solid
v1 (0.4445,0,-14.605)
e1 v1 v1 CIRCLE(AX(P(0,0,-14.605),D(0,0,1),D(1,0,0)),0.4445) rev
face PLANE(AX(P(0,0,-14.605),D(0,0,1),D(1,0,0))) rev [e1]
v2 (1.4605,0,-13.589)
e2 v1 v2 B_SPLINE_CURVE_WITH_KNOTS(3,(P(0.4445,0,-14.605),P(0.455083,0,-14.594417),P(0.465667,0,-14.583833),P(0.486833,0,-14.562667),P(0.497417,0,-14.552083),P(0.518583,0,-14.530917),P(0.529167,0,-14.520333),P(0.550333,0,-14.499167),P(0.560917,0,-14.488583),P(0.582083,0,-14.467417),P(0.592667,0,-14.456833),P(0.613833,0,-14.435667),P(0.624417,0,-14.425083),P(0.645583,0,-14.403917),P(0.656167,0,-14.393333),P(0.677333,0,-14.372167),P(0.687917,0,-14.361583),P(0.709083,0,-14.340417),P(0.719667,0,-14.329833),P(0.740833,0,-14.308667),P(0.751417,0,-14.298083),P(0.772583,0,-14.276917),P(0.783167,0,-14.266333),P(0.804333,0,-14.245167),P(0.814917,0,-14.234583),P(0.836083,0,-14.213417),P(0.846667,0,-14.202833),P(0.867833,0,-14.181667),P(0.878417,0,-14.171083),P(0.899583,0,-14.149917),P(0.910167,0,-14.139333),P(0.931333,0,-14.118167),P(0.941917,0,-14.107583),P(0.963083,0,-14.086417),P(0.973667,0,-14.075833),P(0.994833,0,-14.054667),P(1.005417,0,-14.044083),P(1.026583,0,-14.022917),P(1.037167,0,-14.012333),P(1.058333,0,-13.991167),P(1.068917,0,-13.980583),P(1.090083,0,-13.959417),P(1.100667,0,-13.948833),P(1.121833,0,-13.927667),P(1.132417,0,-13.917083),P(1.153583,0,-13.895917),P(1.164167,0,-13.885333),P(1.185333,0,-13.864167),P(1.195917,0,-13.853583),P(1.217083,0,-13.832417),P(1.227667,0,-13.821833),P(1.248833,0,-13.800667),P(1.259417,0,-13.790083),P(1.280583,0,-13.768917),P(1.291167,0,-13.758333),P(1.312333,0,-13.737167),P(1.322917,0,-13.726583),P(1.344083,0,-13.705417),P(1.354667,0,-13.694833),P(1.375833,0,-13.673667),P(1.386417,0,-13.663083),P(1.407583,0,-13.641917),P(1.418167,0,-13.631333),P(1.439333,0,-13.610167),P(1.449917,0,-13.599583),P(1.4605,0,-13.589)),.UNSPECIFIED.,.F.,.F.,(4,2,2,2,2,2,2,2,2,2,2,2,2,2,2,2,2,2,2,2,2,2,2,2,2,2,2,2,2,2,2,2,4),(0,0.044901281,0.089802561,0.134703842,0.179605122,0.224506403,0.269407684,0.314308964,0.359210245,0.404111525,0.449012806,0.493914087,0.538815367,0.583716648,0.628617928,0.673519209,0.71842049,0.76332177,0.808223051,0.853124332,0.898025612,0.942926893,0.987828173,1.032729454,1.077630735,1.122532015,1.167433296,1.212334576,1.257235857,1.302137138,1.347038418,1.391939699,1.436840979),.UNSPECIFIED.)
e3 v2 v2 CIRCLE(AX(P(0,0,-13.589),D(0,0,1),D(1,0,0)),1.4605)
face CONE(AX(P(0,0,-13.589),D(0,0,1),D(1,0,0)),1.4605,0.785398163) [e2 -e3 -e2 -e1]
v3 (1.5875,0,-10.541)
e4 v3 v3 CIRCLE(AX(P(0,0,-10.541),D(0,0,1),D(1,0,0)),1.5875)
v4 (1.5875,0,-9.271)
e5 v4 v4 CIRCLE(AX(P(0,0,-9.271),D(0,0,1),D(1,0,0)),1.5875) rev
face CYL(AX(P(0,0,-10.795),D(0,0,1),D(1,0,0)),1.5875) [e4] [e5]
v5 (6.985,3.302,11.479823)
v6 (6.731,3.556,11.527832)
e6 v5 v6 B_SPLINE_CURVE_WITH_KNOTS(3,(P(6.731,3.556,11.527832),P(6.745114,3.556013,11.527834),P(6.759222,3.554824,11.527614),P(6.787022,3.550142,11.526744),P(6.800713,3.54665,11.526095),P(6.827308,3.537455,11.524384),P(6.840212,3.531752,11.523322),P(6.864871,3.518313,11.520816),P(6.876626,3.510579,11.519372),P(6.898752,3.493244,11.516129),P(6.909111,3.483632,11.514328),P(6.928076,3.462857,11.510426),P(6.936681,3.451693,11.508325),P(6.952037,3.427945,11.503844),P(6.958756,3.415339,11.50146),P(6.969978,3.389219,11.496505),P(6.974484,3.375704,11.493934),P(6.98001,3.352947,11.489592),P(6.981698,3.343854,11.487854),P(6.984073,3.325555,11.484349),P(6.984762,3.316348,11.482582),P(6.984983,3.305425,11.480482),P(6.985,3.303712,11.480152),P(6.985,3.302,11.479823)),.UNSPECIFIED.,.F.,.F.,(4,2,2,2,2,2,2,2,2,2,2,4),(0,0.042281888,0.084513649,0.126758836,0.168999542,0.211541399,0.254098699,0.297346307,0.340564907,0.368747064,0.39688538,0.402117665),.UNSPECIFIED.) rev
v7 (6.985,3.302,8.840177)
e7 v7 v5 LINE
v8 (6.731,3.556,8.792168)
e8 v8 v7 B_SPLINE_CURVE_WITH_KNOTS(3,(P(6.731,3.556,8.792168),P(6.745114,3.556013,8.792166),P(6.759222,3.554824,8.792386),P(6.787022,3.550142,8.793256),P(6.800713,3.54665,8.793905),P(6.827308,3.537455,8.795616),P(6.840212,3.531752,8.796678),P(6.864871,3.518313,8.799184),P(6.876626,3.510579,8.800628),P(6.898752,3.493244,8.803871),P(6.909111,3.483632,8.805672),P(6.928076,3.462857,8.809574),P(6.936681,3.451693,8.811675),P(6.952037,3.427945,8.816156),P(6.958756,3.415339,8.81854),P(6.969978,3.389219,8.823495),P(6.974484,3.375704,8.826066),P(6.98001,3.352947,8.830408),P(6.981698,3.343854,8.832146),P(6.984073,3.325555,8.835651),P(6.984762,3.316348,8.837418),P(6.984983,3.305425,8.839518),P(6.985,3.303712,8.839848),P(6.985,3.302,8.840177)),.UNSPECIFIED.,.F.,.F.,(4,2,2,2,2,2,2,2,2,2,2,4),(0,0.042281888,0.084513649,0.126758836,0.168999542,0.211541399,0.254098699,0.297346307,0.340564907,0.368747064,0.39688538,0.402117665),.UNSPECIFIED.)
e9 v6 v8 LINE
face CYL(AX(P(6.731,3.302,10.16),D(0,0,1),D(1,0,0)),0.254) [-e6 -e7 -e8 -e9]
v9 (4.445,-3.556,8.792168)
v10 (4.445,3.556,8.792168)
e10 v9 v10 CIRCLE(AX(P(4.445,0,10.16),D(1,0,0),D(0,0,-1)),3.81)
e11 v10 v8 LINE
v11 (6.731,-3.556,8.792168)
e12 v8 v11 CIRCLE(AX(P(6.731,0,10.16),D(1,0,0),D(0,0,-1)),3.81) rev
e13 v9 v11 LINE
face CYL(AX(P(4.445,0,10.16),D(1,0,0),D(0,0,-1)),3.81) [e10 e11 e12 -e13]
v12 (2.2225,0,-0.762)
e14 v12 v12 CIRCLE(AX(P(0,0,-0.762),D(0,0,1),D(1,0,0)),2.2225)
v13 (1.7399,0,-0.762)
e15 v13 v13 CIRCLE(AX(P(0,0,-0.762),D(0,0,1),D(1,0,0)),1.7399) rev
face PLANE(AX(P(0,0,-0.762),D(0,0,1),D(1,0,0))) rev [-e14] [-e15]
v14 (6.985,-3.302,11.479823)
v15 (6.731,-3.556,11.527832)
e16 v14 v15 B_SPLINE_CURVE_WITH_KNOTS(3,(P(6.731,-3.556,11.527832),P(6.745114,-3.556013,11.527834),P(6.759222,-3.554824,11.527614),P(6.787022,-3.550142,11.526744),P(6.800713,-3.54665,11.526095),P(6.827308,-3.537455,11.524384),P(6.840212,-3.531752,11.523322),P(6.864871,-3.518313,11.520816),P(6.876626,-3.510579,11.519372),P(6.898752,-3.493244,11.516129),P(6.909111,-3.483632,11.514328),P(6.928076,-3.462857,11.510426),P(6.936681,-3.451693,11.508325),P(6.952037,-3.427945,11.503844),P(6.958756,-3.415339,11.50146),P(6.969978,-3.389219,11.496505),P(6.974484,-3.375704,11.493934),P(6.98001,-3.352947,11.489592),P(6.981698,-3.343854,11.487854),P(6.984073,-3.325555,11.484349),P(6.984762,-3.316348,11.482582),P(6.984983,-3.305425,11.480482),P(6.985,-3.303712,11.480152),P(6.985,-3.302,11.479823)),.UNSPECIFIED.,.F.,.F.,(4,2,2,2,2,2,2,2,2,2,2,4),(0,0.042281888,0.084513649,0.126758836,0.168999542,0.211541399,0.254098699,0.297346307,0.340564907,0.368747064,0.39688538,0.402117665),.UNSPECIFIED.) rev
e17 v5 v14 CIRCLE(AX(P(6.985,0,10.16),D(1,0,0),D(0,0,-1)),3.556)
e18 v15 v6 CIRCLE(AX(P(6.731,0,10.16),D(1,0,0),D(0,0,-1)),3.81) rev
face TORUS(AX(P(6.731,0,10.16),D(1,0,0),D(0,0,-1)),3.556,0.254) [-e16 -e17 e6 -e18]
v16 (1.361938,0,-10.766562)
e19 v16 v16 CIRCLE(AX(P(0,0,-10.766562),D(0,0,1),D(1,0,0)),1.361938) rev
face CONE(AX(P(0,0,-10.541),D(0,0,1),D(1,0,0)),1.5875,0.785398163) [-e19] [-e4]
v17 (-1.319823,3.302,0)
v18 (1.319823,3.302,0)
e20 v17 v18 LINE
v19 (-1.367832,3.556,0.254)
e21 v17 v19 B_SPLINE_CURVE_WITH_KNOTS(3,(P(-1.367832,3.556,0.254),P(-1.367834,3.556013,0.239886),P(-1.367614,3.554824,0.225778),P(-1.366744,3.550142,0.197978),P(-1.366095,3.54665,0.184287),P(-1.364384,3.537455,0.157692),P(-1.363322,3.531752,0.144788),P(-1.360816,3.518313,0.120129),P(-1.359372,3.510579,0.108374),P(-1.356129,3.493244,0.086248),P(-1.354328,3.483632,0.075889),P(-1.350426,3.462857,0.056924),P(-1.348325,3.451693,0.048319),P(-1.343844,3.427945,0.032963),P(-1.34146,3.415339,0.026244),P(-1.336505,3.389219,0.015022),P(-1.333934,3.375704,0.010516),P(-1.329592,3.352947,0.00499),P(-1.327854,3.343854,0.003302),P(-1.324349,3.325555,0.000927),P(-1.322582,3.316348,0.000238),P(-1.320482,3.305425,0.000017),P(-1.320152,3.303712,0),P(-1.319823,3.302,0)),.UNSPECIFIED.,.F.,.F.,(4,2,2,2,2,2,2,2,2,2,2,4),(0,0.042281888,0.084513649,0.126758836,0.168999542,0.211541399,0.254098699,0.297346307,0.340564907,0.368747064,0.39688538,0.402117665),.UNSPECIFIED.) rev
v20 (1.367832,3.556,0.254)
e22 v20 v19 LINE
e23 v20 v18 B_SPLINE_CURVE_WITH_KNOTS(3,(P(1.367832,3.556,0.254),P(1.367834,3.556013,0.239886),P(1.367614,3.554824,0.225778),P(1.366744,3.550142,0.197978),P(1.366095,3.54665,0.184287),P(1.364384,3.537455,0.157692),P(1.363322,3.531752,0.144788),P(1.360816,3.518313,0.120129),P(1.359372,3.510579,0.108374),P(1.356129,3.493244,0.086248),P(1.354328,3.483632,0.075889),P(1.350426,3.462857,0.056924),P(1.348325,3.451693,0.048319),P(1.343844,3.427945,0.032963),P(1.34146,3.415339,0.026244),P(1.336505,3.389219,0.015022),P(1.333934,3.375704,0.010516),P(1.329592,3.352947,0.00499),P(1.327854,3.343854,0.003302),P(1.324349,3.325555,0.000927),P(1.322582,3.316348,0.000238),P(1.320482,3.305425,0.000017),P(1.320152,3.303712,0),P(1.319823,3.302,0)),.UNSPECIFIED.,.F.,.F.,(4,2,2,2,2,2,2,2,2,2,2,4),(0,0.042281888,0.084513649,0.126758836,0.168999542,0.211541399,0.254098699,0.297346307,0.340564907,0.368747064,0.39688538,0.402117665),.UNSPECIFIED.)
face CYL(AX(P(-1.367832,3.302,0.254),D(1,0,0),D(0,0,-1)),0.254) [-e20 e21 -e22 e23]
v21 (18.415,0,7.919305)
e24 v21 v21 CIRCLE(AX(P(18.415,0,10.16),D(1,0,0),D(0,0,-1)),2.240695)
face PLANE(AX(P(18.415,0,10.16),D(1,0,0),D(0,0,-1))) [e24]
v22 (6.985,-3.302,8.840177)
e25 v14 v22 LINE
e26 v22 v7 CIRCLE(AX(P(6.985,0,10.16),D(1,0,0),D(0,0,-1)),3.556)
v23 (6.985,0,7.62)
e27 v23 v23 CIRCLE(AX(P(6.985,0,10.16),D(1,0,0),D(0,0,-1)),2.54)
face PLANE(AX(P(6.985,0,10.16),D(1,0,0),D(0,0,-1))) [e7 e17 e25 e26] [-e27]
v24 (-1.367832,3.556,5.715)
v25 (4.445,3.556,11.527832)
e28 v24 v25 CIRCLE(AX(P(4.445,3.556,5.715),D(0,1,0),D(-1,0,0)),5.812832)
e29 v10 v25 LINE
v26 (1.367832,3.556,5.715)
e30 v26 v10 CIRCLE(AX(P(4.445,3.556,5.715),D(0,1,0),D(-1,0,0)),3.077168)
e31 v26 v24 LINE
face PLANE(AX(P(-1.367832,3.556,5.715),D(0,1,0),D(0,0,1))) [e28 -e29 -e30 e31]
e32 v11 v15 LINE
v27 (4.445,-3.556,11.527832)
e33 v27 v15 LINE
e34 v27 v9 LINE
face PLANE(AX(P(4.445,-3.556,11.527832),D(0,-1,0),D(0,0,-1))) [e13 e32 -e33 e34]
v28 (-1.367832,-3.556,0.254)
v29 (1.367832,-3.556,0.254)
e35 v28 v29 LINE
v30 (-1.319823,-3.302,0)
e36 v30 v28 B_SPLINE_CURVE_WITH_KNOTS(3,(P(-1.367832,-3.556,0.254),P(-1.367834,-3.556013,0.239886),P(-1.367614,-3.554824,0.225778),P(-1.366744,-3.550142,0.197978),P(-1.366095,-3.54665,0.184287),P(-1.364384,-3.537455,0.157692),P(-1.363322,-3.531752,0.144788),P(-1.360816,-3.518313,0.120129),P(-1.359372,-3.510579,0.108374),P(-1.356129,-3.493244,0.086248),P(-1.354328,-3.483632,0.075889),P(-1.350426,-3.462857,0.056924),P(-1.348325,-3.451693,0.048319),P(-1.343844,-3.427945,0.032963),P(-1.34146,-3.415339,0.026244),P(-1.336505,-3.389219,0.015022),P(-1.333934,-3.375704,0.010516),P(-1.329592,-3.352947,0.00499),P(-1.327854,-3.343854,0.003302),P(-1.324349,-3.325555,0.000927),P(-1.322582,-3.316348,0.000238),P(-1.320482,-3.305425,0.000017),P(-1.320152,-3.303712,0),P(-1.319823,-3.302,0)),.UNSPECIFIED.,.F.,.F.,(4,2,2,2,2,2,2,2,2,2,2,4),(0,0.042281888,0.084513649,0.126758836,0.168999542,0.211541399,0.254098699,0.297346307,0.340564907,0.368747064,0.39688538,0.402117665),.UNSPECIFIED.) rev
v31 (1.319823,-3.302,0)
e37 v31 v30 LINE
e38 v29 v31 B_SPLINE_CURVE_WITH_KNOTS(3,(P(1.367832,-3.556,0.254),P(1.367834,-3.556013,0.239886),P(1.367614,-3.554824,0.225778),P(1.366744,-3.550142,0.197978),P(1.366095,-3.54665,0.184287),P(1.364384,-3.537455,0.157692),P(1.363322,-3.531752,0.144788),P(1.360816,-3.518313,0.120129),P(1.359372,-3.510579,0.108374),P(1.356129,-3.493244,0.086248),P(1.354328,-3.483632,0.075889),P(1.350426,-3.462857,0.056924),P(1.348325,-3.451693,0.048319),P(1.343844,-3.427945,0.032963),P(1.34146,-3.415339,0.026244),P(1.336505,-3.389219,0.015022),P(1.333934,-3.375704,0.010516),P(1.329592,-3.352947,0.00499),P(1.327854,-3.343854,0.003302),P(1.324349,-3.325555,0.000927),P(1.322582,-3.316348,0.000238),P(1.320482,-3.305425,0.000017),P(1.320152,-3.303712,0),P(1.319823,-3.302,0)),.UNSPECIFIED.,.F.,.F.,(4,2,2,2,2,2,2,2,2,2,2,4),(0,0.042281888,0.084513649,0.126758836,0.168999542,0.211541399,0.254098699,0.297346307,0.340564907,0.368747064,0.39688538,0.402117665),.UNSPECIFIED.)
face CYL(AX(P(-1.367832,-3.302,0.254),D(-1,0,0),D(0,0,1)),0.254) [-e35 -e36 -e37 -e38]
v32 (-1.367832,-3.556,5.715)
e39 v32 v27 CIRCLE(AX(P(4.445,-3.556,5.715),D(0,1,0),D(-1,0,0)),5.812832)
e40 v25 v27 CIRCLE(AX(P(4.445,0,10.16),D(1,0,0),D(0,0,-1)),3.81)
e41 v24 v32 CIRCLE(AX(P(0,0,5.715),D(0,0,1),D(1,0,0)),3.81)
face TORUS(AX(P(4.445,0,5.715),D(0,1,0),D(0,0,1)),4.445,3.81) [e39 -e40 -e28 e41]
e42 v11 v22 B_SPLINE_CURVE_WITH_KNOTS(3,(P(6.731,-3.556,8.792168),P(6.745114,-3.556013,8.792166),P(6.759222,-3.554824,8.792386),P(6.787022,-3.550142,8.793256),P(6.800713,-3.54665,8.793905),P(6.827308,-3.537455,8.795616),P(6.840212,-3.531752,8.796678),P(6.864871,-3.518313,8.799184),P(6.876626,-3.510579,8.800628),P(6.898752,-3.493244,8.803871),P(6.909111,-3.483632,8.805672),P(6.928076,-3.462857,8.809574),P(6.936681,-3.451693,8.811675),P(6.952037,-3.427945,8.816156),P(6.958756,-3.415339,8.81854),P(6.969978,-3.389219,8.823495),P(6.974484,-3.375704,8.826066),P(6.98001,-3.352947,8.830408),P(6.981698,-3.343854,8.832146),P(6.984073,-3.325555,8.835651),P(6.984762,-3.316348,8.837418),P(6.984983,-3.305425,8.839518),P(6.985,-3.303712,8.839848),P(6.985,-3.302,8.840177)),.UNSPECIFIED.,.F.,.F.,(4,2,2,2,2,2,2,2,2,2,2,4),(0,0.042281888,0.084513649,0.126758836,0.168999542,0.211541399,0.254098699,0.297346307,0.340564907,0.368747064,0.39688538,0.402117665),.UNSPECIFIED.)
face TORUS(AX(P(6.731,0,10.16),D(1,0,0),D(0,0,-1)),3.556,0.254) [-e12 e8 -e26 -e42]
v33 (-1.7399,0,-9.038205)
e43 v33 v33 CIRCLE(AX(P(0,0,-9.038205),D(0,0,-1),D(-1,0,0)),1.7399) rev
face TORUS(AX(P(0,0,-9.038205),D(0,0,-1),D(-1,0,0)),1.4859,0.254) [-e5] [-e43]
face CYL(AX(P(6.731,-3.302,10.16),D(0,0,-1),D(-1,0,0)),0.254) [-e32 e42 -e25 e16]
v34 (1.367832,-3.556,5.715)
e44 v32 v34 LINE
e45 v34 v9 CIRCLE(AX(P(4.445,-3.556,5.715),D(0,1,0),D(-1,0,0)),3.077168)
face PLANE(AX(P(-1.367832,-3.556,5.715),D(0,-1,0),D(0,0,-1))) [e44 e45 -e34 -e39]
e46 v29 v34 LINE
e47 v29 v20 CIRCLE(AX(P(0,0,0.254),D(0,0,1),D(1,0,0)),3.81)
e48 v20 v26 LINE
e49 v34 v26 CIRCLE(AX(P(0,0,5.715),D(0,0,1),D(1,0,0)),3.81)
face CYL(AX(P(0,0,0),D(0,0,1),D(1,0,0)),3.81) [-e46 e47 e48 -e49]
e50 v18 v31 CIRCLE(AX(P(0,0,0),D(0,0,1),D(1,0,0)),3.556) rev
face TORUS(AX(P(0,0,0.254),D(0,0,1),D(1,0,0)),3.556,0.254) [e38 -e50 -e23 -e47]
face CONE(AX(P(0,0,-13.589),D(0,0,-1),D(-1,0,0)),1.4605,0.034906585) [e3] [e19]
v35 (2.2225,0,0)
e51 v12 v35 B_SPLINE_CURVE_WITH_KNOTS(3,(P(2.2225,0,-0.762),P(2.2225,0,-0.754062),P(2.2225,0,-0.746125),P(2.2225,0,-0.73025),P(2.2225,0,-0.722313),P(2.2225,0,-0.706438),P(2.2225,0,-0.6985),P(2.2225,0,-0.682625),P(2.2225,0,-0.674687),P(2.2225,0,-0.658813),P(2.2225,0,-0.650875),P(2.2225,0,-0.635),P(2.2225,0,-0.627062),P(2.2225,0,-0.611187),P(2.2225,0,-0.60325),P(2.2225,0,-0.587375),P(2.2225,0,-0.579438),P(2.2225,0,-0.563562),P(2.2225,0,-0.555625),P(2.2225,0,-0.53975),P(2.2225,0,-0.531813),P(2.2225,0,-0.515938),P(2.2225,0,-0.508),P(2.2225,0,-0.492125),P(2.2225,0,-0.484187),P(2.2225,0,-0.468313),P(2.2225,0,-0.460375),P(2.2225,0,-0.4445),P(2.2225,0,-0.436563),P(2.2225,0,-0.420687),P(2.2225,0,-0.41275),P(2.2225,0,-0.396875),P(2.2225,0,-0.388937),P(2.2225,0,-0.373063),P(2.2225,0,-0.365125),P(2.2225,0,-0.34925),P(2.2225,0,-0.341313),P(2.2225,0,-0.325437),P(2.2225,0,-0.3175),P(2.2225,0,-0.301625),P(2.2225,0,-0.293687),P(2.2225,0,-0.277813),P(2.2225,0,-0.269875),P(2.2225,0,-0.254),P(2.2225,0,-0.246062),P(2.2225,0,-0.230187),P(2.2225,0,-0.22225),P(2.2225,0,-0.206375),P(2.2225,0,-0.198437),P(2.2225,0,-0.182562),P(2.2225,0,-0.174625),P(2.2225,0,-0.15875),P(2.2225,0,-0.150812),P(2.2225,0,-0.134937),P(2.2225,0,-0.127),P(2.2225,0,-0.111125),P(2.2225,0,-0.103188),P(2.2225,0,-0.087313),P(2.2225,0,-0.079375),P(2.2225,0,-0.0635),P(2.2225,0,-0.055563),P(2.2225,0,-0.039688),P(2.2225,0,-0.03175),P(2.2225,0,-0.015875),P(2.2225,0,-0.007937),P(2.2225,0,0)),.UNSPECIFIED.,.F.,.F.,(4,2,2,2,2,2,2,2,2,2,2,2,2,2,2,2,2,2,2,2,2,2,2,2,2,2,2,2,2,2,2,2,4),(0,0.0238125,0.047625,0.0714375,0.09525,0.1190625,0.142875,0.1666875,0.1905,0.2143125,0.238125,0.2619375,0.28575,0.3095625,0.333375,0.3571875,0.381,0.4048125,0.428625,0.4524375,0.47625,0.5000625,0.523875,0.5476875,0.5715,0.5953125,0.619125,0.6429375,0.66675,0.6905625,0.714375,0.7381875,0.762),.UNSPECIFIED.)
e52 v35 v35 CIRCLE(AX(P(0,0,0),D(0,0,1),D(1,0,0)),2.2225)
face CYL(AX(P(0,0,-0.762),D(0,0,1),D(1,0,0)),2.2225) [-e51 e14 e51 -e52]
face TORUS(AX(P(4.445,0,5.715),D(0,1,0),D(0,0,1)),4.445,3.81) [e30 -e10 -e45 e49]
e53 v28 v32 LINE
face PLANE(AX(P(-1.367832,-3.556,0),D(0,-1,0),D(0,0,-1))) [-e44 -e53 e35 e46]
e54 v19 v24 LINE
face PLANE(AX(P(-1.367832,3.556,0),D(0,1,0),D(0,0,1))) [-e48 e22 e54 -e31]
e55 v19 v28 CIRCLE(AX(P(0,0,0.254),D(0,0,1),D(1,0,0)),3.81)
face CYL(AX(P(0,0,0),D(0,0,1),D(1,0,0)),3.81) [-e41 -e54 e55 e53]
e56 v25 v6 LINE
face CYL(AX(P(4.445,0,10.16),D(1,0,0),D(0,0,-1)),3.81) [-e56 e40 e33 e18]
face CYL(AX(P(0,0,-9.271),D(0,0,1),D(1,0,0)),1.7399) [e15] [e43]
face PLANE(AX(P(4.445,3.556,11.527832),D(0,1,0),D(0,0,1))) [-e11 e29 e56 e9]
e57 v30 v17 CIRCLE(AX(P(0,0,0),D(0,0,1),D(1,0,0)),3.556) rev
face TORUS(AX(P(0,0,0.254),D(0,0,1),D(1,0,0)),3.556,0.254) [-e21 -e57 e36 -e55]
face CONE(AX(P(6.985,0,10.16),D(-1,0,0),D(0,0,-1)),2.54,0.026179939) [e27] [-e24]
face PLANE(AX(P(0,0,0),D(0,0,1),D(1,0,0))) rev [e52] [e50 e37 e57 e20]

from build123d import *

# Parameters (mm, degrees)
SKETCH1_R           = 1.4605
BOSS_EXTRUDE1_DEPTH = 14.605
CHAMFER1_SIZE       = 1.016
SKETCH2_R           = 1.5875
BOSS_EXTRUDE2_DEPTH = 10.795
SKETCH3_R           = 1.7399
BOSS_EXTRUDE3_DEPTH = 9.271
FILLET1_R           = 0.254
SKETCH5_R           = 2.2225
BOSS_EXTRUDE4_DEPTH = 0.762
SKETCH8_R           = 2.54
BOSS_EXTRUDE5_DEPTH = 11.43
BOSS_EXTRUDE5_TAPER = 1.5
FILLET2_R           = 0.254


with BuildPart() as part:
    # Sketch1 → Boss-Extrude1 (new body)
    with BuildSketch(Plane.XY):
        Circle(SKETCH1_R)
    extrude(amount=-BOSS_EXTRUDE1_DEPTH)

    # Chamfer1
    chamfer1_edges = [part.edges().sort_by_distance(p)[0] for p in [
        (-1.4605, 0, -14.605),
    ]]
    chamfer(chamfer1_edges, length=CHAMFER1_SIZE)

    # Sketch4 → Cut-Revolve1 (revolve, cut)
    with BuildSketch(Plane(origin=(0, 0, 0), x_dir=(1, 0, 0), z_dir=(0, 1, 0))):
        Polygon((1.4605, 13.589), (0.985961663, 0), (2.040319949, 0), (2.040319949, 13.589), align=None)
    revolve(axis=Axis((0, 0, 1000), (0, 0, -1)), mode=Mode.SUBTRACT)

    # Sketch2 → Boss-Extrude2 (add)
    with BuildSketch(Plane.XY):
        Circle(SKETCH2_R)
    extrude(amount=-BOSS_EXTRUDE2_DEPTH)

    # Chamfer2: read off the stored shape, not the designer's step
    # Chamfer2 outline → Chamfer2 (revolve, cut)
    with BuildSketch(Plane.XZ):
        Polygon((1.361938283, -10.766561717), (1.36293137, -10.766561717), (1.36293137, -10.795), (1.5875, -10.795), (1.5875, -10.541), align=None)
    revolve(axis=Axis((0, 0, 0), (0, 0, 1)), mode=Mode.SUBTRACT)

    # Sketch3 → Boss-Extrude3 (add)
    with BuildSketch(Plane.XY):
        Circle(SKETCH3_R)
    extrude(amount=-BOSS_EXTRUDE3_DEPTH)

    # Fillet1
    # the kernel refuses this fillet: 0.254 mm, written as the material it takes off along each edge
    with BuildSketch(Plane(origin=(0, 0, -9.271), x_dir=(1, 0, 0), z_dir=(0, -1, 0))) as fillet1_piece_1:
        with BuildLine():
            CenterArc((1.4859, 0.232794845), FILLET1_R, 293.578178478, 66.421821522)
            Line((1.7399, 0.232794845), (1.74498, 0.232794845))
            Line((1.74498, 0.232794845), (1.74498, 0))
            Line((1.74498, 0), (1.7399, -0.00508))
            ThreePointArc((1.7399, -0.00508), (1.6637, -0.00508), (1.589532, -0.004655897))
            Line((1.589532, -0.004655897), (1.5875, 0))
        make_face()
    revolve(axis=Axis((0, 0, -9.271), (0, 0, 1)), mode=Mode.SUBTRACT)

    # Sketch5 → Boss-Extrude4 (add)
    with BuildSketch(Plane.XY):
        Circle(SKETCH5_R)
    extrude(amount=-BOSS_EXTRUDE4_DEPTH)

    # Sweep2: sweep along a path in Sketch7
    with BuildLine(Plane(origin=(0, 0, 0), x_dir=(1, 0, 0), z_dir=(0, 1, 0))) as sweep2_path:
        Line((0, 0), (0, -5.715))
        ThreePointArc((0, -5.715), (1.301910358, -8.858089642), (4.445, -10.16))
        Line((4.445, -10.16), (6.985, -10.16))
    # Sketch6 → Sweep2 (sweep)
    with BuildSketch(Plane.XY):
        with BuildLine():
            Line((-1.367831861, 3.556), (1.367831861, 3.556))
            ThreePointArc((1.367831861, 3.556), (3.81, 0), (1.367831861, -3.556))
            Line((1.367831861, -3.556), (-1.367831861, -3.556))
            ThreePointArc((-1.367831861, -3.556), (-3.81, 0), (-1.367831861, 3.556))
        make_face()
    sweep(path=sweep2_path.line)

    # Sketch8 → Boss-Extrude5 (add)
    with BuildSketch(Plane(origin=(6.985, 0, 0), x_dir=(0, 0, -1), z_dir=(1, 0, 0))):
        with Locations((-10.16, 0)):
            Circle(SKETCH8_R)
    extrude(amount=BOSS_EXTRUDE5_DEPTH, taper=BOSS_EXTRUDE5_TAPER)

    # Fillet2
    fillet2_edges = [part.edges().sort_by_distance(p)[0] for p in [
        (6.985, 0, 13.97),
        (6.985, -3.556, 10.16),
        (6.985, 0, 6.35),
        (6.985, 3.556, 10.16),
        (-3.81, 0, 0),
        (0, -3.556, 0),
        (3.81, 0, 0),
        (0, 3.556, 0),
    ]]
    fillet(fillet2_edges, radius=FILLET2_R - 0.0001)  # a hair under: the kernel refuses the full size


solid = part.part
